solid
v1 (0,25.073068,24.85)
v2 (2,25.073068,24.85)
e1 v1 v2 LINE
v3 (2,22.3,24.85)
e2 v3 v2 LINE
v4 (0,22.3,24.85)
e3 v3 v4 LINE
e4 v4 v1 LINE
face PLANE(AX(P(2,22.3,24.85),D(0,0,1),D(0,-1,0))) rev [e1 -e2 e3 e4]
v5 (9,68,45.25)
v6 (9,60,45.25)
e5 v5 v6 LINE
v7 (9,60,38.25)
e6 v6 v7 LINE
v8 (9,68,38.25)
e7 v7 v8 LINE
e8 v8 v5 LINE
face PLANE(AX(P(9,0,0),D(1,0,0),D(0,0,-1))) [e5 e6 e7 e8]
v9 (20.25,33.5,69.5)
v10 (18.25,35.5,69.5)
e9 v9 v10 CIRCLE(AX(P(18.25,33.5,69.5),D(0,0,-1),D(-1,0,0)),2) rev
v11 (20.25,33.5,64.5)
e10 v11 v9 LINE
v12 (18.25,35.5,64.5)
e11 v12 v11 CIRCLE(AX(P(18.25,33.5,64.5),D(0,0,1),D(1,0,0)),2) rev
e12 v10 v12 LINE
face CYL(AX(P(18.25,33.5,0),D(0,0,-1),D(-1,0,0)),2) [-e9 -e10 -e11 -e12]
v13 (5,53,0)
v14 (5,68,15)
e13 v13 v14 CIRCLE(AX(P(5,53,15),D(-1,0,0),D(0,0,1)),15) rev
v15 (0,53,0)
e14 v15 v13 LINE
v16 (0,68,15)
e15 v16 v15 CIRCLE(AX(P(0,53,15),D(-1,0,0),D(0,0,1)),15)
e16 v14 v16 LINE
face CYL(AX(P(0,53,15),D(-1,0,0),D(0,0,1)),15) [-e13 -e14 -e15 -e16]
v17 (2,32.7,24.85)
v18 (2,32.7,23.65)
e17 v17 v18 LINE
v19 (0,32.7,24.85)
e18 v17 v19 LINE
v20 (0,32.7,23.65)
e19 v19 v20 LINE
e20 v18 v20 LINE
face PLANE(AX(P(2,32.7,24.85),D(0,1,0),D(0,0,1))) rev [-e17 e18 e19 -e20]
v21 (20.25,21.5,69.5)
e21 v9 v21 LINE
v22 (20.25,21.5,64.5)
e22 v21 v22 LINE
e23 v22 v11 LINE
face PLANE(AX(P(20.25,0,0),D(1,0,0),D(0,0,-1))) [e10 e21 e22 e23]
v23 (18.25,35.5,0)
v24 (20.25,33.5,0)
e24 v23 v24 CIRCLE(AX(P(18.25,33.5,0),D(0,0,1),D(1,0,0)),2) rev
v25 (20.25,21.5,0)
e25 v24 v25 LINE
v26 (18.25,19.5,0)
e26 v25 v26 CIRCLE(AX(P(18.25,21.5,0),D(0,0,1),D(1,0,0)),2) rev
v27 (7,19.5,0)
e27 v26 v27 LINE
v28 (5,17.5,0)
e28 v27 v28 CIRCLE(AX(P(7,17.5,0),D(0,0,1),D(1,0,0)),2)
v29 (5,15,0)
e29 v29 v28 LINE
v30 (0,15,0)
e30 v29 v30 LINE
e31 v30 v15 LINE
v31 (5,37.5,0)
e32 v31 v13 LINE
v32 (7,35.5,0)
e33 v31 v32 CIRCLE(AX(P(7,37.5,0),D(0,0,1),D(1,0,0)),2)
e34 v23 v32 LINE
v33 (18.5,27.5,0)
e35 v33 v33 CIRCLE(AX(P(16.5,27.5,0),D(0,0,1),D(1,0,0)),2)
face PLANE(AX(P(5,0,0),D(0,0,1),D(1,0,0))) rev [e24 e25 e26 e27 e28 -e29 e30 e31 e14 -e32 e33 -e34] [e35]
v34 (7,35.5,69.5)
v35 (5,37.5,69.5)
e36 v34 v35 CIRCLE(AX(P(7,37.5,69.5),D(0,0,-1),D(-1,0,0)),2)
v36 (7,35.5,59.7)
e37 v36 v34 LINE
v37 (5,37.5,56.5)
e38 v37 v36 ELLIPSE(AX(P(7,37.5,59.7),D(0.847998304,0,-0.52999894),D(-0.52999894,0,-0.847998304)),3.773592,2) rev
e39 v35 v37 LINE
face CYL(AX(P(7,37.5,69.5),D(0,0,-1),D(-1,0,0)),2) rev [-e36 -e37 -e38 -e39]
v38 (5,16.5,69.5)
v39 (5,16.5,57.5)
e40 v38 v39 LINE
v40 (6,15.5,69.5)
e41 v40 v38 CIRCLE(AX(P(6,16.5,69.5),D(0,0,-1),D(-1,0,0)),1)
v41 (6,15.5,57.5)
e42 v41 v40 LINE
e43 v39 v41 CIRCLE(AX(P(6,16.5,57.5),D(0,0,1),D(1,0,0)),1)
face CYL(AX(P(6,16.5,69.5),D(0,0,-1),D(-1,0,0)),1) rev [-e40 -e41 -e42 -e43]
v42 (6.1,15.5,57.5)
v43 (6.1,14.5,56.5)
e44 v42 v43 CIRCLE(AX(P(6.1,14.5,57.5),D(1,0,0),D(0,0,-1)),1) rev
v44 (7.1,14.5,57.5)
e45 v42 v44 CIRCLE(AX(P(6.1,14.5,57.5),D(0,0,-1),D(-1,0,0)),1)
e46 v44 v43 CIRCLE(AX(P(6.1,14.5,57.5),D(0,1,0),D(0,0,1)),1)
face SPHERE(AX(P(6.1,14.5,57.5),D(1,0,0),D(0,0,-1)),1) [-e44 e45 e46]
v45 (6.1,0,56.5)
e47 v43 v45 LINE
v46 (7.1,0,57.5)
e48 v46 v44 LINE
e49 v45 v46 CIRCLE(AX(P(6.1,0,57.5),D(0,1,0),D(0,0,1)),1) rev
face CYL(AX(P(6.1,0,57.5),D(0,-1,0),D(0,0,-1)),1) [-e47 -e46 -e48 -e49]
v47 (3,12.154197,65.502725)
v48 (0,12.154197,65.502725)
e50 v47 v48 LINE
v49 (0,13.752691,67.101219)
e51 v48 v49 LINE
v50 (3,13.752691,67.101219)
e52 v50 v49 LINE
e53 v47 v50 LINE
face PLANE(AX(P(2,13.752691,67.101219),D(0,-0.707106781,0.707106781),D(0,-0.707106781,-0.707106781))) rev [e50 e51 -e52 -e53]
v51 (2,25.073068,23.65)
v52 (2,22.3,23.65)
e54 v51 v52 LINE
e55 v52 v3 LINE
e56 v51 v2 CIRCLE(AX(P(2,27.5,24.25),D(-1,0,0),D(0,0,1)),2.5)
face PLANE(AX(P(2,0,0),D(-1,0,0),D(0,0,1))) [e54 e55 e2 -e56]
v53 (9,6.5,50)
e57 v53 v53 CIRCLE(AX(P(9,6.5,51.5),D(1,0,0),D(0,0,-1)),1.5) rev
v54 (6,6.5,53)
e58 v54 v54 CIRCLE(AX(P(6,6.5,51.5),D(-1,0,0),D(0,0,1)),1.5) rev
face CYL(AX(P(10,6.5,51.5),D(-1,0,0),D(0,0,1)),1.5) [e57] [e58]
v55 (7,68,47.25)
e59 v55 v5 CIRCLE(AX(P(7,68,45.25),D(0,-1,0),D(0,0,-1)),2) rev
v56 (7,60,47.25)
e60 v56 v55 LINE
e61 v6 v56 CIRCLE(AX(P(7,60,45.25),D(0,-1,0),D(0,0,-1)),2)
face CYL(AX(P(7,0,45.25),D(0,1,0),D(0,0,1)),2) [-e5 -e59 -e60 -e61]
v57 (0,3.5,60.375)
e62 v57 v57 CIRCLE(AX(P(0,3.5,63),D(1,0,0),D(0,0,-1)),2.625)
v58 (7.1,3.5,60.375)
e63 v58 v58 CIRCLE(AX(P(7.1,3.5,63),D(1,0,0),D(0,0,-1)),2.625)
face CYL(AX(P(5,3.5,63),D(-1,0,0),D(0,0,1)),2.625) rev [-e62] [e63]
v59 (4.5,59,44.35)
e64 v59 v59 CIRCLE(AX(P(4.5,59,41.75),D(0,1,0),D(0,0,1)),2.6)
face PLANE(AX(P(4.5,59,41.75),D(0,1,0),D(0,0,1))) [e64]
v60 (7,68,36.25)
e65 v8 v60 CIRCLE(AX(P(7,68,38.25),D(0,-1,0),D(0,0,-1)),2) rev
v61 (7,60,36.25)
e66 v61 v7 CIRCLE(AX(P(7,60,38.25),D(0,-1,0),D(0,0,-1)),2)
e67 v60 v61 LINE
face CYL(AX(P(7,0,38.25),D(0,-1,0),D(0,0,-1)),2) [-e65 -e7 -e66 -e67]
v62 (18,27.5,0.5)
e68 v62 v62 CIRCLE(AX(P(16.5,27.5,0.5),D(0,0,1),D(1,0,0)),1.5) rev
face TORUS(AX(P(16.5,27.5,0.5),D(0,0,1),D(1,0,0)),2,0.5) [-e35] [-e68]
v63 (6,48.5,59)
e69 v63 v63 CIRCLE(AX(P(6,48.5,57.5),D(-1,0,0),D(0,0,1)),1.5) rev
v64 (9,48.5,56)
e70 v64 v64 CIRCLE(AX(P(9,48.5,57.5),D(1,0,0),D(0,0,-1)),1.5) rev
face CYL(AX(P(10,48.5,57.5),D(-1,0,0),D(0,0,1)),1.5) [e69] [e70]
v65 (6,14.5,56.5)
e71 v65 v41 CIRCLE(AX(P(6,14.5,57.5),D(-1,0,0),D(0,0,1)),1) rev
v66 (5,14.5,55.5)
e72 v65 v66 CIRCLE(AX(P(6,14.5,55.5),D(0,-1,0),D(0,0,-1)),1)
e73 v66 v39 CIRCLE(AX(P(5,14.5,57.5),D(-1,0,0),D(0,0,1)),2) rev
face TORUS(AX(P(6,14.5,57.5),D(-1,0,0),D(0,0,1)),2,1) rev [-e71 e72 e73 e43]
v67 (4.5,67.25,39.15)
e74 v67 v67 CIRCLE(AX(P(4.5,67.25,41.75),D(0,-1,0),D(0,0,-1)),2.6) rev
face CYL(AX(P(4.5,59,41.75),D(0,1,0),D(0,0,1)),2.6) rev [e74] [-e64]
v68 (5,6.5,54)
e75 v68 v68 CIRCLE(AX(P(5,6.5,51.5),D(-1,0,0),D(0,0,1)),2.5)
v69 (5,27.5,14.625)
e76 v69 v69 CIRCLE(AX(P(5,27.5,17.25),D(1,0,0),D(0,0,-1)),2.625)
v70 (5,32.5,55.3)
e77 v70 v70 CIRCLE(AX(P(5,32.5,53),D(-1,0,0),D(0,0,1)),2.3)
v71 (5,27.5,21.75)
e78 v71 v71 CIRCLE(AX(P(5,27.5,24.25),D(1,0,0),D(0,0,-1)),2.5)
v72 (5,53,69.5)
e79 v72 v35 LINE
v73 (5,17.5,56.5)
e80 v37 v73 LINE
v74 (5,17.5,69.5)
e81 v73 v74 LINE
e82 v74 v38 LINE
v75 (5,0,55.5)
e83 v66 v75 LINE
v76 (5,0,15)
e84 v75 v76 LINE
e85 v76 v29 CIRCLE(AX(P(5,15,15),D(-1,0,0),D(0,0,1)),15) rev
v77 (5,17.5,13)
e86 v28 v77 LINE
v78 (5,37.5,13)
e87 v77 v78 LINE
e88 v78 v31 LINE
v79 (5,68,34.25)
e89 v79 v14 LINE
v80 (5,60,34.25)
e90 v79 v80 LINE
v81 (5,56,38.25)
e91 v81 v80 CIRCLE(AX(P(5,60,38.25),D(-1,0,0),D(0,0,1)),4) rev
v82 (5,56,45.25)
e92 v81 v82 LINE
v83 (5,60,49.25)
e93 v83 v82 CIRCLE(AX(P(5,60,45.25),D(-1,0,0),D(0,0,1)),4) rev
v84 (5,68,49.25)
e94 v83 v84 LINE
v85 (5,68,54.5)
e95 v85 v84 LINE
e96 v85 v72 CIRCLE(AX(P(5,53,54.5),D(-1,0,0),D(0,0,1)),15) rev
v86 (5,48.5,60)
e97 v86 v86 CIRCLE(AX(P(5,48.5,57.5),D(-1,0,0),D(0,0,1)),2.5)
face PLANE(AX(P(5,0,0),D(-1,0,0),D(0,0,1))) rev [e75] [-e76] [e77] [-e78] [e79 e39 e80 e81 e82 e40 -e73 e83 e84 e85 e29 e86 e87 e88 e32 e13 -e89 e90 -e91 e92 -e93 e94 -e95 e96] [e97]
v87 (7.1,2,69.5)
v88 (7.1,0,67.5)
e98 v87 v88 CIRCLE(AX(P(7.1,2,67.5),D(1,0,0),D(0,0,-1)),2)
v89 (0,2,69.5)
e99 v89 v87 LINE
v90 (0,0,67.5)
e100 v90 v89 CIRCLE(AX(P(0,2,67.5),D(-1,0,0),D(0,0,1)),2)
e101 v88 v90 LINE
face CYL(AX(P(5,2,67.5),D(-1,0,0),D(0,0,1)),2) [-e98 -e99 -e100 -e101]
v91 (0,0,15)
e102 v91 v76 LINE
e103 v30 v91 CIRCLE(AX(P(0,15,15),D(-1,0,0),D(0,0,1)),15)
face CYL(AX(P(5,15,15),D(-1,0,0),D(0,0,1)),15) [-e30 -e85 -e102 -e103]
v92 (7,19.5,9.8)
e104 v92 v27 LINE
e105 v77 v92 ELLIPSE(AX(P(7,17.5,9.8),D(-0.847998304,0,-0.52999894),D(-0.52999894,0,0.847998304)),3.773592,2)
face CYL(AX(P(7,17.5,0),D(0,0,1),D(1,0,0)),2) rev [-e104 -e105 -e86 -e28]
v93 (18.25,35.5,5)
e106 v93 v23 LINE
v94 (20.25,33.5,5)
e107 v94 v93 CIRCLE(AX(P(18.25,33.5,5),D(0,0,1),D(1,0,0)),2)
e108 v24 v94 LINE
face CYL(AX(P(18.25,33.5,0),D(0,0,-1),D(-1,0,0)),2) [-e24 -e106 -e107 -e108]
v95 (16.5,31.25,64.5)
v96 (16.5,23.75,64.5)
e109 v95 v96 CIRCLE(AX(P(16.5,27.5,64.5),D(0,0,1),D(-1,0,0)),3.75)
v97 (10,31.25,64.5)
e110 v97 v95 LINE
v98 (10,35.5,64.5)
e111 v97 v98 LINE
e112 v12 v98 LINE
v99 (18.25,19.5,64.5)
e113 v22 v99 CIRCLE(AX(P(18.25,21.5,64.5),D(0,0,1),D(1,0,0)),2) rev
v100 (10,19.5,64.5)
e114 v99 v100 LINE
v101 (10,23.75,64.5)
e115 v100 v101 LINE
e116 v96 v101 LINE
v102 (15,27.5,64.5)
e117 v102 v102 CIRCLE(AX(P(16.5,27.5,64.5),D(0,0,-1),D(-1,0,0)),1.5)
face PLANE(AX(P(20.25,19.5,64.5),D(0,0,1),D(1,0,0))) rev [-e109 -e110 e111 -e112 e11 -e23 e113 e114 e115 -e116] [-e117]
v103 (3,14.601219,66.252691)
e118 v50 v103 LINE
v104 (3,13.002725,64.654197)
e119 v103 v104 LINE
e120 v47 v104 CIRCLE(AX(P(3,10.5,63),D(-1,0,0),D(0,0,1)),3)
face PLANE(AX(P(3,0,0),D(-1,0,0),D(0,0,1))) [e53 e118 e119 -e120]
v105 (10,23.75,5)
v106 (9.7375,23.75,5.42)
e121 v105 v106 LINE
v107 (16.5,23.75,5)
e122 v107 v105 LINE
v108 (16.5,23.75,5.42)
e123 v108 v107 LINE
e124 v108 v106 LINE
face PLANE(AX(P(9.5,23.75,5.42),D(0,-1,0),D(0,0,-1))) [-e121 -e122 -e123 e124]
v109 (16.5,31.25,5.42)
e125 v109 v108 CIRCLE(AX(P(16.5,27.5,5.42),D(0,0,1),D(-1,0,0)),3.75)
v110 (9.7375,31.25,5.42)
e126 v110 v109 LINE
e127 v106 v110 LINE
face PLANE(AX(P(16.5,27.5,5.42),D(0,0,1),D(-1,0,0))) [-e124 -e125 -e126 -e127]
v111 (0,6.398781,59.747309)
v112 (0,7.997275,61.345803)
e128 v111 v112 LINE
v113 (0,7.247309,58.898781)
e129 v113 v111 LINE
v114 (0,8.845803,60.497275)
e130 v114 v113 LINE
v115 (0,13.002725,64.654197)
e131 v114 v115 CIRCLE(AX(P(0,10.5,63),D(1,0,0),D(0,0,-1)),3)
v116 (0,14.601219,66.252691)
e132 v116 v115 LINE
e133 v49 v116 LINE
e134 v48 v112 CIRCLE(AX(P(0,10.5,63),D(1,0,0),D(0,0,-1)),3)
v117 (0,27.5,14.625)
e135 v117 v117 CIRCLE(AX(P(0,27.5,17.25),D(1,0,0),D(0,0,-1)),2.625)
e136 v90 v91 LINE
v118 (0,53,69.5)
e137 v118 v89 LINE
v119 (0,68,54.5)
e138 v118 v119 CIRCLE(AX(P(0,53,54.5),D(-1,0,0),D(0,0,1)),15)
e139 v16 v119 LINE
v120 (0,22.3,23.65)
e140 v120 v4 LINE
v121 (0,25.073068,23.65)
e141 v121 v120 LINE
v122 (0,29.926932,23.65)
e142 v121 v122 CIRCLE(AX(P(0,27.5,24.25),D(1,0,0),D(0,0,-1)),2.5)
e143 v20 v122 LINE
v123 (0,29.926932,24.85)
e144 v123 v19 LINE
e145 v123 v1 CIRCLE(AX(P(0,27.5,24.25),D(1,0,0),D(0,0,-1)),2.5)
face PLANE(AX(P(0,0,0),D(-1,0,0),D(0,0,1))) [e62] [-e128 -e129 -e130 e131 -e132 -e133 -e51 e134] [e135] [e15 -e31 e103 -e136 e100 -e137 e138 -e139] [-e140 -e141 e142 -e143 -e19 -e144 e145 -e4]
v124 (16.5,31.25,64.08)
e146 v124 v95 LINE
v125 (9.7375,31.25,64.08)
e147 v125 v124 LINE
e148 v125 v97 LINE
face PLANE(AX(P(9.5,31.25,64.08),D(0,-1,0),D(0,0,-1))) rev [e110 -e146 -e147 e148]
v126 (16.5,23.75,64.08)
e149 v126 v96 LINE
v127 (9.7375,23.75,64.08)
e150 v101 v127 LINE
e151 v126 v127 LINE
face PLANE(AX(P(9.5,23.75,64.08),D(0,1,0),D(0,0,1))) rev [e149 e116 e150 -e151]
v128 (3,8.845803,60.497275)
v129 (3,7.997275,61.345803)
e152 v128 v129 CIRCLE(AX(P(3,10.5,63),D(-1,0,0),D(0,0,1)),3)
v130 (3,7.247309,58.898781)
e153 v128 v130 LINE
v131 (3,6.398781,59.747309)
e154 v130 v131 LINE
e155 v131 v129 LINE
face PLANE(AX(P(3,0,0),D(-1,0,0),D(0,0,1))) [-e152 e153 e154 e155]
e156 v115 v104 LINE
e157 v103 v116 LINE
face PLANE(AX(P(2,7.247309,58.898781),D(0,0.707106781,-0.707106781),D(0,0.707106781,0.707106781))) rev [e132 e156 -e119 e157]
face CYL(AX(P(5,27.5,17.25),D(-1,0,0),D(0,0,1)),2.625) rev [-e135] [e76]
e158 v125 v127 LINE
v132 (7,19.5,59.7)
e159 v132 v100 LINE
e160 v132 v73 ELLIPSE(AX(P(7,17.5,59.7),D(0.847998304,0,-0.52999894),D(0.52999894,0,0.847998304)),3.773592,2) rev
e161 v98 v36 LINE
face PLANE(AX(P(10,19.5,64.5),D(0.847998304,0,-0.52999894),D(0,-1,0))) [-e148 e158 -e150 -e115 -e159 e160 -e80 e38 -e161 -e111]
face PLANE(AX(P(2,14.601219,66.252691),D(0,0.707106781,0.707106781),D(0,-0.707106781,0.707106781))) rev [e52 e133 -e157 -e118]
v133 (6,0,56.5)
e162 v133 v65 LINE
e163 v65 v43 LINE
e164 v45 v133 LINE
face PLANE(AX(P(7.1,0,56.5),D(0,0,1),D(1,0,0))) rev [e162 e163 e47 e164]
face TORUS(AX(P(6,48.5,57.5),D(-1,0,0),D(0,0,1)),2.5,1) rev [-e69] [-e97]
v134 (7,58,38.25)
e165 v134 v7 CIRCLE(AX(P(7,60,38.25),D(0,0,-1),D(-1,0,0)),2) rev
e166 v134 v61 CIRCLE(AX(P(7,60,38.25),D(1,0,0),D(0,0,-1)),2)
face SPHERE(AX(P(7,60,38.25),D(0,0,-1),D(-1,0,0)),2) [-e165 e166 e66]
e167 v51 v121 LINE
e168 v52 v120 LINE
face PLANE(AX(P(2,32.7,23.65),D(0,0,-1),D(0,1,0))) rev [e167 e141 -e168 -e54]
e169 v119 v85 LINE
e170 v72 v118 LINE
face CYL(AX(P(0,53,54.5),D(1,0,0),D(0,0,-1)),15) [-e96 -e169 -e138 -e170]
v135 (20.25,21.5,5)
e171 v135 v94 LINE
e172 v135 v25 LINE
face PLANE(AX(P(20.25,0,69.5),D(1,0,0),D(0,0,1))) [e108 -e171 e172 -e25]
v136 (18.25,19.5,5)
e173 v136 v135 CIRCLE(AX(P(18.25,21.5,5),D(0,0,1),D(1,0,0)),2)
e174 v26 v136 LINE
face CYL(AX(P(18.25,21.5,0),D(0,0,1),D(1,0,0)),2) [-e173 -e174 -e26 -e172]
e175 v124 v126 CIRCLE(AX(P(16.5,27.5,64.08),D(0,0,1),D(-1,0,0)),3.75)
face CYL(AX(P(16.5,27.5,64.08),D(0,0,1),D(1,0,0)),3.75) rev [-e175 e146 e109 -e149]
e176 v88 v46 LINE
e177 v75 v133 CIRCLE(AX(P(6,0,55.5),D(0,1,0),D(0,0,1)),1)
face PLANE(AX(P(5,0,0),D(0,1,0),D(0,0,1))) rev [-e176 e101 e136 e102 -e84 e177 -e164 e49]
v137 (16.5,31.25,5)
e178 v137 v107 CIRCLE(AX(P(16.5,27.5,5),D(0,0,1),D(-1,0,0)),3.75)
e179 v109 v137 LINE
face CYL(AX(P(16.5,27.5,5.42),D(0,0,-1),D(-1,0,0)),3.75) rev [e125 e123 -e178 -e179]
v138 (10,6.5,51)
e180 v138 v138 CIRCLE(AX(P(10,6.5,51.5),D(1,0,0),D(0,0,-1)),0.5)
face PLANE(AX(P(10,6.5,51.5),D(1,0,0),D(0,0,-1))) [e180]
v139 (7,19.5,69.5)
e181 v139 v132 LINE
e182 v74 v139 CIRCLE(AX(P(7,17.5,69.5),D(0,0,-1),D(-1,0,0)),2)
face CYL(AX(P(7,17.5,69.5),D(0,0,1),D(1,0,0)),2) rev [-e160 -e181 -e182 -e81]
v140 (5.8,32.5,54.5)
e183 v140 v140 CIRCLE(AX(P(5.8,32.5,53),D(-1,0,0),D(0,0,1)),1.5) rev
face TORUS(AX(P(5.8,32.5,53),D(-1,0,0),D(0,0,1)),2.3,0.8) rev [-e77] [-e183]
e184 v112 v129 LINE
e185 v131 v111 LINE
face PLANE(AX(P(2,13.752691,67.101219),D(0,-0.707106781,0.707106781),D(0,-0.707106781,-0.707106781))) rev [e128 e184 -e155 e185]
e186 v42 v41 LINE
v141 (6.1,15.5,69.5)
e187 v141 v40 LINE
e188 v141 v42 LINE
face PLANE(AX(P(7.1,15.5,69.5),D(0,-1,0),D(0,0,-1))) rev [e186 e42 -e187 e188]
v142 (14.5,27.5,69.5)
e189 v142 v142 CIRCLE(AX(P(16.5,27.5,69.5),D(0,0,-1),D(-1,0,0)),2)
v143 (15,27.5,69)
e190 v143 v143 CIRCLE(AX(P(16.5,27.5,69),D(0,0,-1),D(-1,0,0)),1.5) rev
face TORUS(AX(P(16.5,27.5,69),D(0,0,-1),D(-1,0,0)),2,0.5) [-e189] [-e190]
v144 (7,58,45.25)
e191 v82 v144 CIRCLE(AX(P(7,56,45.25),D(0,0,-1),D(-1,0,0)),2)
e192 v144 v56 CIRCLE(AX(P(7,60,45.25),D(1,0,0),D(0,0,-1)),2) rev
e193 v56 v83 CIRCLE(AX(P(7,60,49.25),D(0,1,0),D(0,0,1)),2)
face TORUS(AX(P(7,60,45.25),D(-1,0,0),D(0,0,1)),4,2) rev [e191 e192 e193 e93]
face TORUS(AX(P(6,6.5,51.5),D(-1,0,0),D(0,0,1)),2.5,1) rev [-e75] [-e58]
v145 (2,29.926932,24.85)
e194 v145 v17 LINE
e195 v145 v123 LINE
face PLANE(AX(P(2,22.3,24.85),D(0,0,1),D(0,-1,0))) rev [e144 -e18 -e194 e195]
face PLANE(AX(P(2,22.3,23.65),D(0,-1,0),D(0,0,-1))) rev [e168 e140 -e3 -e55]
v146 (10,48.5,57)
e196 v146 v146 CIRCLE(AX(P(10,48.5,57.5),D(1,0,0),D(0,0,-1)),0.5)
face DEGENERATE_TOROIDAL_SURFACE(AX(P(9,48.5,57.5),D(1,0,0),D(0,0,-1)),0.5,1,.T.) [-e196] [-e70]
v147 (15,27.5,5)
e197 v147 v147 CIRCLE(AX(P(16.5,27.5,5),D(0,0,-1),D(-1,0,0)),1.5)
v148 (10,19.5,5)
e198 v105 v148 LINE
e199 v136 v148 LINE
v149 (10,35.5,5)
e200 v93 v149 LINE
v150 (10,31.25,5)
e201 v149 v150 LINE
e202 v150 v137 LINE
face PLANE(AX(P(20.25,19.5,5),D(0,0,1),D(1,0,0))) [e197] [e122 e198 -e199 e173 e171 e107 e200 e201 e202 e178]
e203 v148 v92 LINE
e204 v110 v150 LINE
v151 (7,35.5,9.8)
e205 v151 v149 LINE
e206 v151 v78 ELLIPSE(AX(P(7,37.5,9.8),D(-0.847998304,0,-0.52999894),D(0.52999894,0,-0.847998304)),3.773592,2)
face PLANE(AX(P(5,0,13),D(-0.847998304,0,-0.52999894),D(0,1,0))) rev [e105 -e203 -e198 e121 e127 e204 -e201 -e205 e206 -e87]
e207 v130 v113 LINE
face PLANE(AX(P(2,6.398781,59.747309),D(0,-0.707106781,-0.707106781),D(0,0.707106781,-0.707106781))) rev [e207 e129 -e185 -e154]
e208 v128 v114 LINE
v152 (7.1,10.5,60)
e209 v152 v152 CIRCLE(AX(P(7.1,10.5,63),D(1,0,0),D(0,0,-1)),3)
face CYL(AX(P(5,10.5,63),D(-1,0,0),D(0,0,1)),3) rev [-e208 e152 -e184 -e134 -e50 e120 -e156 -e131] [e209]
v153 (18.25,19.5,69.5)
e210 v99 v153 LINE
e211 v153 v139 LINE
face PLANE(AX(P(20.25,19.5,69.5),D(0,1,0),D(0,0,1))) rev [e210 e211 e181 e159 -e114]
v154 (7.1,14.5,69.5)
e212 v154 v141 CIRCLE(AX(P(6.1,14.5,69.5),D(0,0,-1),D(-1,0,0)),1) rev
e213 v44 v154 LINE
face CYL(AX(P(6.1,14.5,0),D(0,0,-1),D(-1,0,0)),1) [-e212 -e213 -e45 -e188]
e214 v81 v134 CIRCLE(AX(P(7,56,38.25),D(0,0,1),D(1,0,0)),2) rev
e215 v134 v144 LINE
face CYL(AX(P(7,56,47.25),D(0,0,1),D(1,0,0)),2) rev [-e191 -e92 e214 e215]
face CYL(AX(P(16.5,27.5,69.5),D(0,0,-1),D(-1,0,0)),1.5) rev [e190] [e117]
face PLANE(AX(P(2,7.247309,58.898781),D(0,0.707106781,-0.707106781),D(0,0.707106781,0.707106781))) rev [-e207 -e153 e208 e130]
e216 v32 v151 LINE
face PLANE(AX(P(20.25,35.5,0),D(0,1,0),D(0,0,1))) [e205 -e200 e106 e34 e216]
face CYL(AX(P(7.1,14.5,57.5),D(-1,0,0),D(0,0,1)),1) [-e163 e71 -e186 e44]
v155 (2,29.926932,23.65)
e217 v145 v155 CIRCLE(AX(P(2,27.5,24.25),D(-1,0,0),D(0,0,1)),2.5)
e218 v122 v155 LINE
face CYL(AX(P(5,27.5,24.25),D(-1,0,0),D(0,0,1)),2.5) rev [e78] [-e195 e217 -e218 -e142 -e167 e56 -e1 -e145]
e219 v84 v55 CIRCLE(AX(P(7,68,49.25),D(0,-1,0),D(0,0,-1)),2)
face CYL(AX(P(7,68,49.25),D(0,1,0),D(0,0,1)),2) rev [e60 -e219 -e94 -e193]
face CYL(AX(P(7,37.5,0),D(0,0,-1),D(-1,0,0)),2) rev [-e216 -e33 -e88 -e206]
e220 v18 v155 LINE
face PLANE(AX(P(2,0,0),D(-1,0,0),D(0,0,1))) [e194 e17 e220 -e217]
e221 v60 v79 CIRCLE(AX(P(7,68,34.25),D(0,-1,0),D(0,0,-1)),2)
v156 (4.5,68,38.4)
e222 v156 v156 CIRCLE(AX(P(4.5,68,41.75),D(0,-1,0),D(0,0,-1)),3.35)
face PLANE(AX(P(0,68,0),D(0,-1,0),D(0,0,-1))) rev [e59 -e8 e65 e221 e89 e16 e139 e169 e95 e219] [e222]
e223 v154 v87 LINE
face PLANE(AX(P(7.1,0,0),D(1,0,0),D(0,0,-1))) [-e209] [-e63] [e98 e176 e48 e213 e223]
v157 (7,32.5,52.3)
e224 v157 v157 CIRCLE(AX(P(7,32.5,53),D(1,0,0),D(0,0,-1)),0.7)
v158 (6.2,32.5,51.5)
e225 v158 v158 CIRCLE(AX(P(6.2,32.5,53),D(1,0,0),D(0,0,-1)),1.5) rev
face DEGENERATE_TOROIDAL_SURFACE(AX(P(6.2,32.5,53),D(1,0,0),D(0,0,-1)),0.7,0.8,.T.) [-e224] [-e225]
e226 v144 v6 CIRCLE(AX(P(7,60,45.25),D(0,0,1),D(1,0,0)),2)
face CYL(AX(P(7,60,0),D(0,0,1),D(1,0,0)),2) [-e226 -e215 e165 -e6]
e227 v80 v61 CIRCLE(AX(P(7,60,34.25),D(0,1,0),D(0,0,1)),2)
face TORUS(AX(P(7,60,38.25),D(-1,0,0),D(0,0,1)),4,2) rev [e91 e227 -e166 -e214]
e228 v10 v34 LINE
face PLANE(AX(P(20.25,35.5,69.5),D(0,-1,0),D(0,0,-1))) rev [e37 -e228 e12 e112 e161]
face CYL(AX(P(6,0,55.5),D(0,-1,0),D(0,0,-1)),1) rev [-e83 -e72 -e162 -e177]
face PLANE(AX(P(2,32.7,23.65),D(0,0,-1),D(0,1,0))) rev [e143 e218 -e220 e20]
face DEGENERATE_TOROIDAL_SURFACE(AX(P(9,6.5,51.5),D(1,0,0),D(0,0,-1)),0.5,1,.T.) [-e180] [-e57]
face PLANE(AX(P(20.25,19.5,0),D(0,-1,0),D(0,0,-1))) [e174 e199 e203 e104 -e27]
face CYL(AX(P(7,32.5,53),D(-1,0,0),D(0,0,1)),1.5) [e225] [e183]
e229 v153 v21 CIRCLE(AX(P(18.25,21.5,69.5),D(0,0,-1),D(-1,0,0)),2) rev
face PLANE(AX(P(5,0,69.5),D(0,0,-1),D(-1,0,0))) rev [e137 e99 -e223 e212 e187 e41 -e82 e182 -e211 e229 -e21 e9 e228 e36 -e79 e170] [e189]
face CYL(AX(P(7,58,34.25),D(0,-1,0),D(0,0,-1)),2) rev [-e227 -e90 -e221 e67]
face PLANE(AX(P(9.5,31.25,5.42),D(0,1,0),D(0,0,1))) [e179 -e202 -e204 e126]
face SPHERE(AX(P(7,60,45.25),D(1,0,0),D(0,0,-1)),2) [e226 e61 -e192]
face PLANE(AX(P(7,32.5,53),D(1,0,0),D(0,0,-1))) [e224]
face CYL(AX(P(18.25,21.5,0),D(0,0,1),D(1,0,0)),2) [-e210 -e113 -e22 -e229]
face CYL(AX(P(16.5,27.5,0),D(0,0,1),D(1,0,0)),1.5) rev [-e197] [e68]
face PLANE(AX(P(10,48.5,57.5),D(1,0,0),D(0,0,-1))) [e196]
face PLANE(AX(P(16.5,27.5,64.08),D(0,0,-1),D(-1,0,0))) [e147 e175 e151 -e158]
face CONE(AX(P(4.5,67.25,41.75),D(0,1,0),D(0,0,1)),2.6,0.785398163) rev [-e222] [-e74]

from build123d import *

# Parameters (mm, degrees)
SKETCH1_W           = 55
SKETCH1_H           = 69.5
SKETCH1_R           = 3
SKETCH1_R_2         = 2.5
SKETCH1_R_3         = 2.625
BOSS_EXTRUDE1_DEPTH = 5
SKETCH3_W           = 16
SKETCH3_H           = 5
BOSS_EXTRUDE2_DEPTH = 15.25
SKETCH4_R           = 1.5
CUT_EXTRUDE1_DEPTH  = 88.151090068
SKETCH5_W           = 10.4
SKETCH5_H           = 1.2
CUT_EXTRUDE2_DEPTH  = 2
SKETCH6_W           = 15.5
SKETCH6_H           = 13
SKETCH6_R           = 3
SKETCH6_R_2         = 2.625
BOSS_EXTRUDE3_DEPTH = 2.1
SKETCH13_R          = 1.5
BOSS_EXTRUDE5_DEPTH = 5
SKETCH14_R          = 1.5
BOSS_EXTRUDE6_DEPTH = 2
CUT_EXTRUDE3_START  = -1
CUT_EXTRUDE3_DEPTH  = 1
CHAMFER1_SIZE       = 8
CHAMFER1_SIZE2      = 5
CHAMFER2_SIZE       = 5
CHAMFER2_SIZE2      = 8
FILLET3_R           = 0.5
FILLET2_R           = 2
FILLET4_R           = 1
FILLET5_R           = 0.8
BOSS_EXTRUDE4_DEPTH = 0.42
SKETCH18_W          = 5
SKETCH18_H          = 69.5
BOSS_EXTRUDE8_DEPTH = 13
SKETCH15_W          = 10
SKETCH15_H          = 11
BOSS_EXTRUDE7_DEPTH = 4
FILLET1_R           = 15
SKETCH16_R          = 2.6
CUT_EXTRUDE8_DEPTH  = 9
CHAMFER3_SIZE       = 0.75
FILLET6_R           = 2


# Read off the part's stored shape, not the designer's step: Cut-Extrude3
with BuildPart() as part:
    # Sketch1 → Boss-Extrude1 (new body)
    with BuildSketch(Plane.YZ):
        with Locations((27.5, 34.75)):
            Rectangle(SKETCH1_W, SKETCH1_H)
        with Locations(Location((10.5, 63, 0), (0, 0, 270))):
            Circle(SKETCH1_R, mode=Mode.SUBTRACT)
        with Locations(Location((27.5, 24.25, 0), (0, 0, 270))):
            Circle(SKETCH1_R_2, mode=Mode.SUBTRACT)
        with Locations(Location((3.5, 63, 0), (0, 0, 270))):
            Circle(SKETCH1_R_3, mode=Mode.SUBTRACT)
        with Locations(Location((27.5, 17.25, 0), (0, 0, 270))):
            Circle(SKETCH1_R_3, mode=Mode.SUBTRACT)
    extrude(amount=BOSS_EXTRUDE1_DEPTH)

    # Sketch3 → Boss-Extrude2 (add)
    with BuildSketch(Plane.YZ.offset(5)):
        with Locations((27.5, 67)):
            Rectangle(SKETCH3_W, SKETCH3_H)
    boss_extrude2 = extrude(amount=BOSS_EXTRUDE2_DEPTH)

    # Sketch4 → Cut-Extrude1 (cut, through all)
    with BuildSketch(Plane(origin=(0, 0, 64.5), x_dir=(1, 0, 0), z_dir=(0, 0, -1))):
        with Locations(Location((16.5, -27.5, 0), (0, 0, 180))):
            Circle(SKETCH4_R)
    cut_extrude1 = extrude(amount=-CUT_EXTRUDE1_DEPTH, mode=Mode.SUBTRACT)

    # Mirror1: Boss-Extrude2, Cut-Extrude1 across plane
    add(boss_extrude2.mirror(Plane(origin=(0, 0, 34.75), x_dir=(1, 0, 0), z_dir=(0, 0, -1))))
    add(cut_extrude1.mirror(Plane(origin=(0, 0, 34.75), x_dir=(1, 0, 0), z_dir=(0, 0, -1))), mode=Mode.SUBTRACT)

    # Sketch5 → Cut-Extrude2 (cut)
    with BuildSketch(Plane(origin=(0, 0, 0), x_dir=(0, -1, 0), z_dir=(-1, 0, 0))):
        Polygon((-6.398780669, 59.747308807), (-7.247308807, 58.898780669), (-14.601219331, 66.252691193), (-13.752691193, 67.101219331), align=None)
        with Locations((-27.5, 24.25)):
            Rectangle(SKETCH5_W, SKETCH5_H)
    extrude(amount=-CUT_EXTRUDE2_DEPTH, mode=Mode.SUBTRACT)

    # Sketch6 → Boss-Extrude3 (add)
    with BuildSketch(Plane.YZ.offset(5)):
        with Locations((7.75, 63)):
            Rectangle(SKETCH6_W, SKETCH6_H)
        with Locations(Location((10.5, 63, 0), (0, 0, 56.536959033))):
            Circle(SKETCH6_R, mode=Mode.SUBTRACT)
        with Locations(Location((3.5, 63, 0), (0, 0, 270))):
            Circle(SKETCH6_R_2, mode=Mode.SUBTRACT)
    extrude(amount=BOSS_EXTRUDE3_DEPTH)

    # Sketch13 → Boss-Extrude5 (add)
    with BuildSketch(Plane.YZ.offset(5)):
        with Locations(Location((48.5, 57.5, 0), (0, 0, 90))):
            Circle(SKETCH13_R)
        with Locations(Location((6.5, 51.5, 0), (0, 0, 90))):
            Circle(SKETCH13_R)
    extrude(amount=BOSS_EXTRUDE5_DEPTH)

    # Sketch14 → Boss-Extrude6 (add)
    with BuildSketch(Plane.YZ.offset(5)):
        with Locations(Location((32.5, 53, 0), (0, 0, 90))):
            Circle(SKETCH14_R)
    extrude(amount=BOSS_EXTRUDE6_DEPTH)

    # Cut-Extrude3 outline → Cut-Extrude3 (cut)
    with BuildSketch(Plane(origin=(2, 0, 0), x_dir=(0, -1, 0), z_dir=(-1, 0, 0)).offset(CUT_EXTRUDE3_START)):
        with BuildLine():
            Line((-7.247308807, 58.898780669), (-6.398780669, 59.747308807))
            Line((-6.398780669, 59.747308807), (-7.997274962, 61.3458031))
            ThreePointArc((-7.997274962, 61.3458031), (-8.378679656, 60.878679656), (-8.8458031, 60.497274962))
            Line((-8.8458031, 60.497274962), (-7.247308807, 58.898780669))
        make_face()
        with BuildLine():
            Line((-14.601219331, 66.252691193), (-13.002725038, 64.6541969))
            ThreePointArc((-13.002725038, 64.6541969), (-12.621320344, 65.121320344), (-12.1541969, 65.502725038))
            Line((-12.1541969, 65.502725038), (-13.752691193, 67.101219331))
            Line((-13.752691193, 67.101219331), (-14.601219331, 66.252691193))
        make_face()
    extrude(amount=CUT_EXTRUDE3_DEPTH, mode=Mode.SUBTRACT)

    # Chamfer1
    chamfer1_edges = [part.edges().sort_by_distance(p)[0] for p in [
        (5, 27.5, 64.5),
    ]]
    chamfer1_side = [part.faces().sort_by_distance(p)[0] for p in [
        (5, 28.660590977, 33.127058203),
    ]]
    chamfer(chamfer1_edges, length=CHAMFER1_SIZE, length2=CHAMFER1_SIZE2, reference=chamfer1_side[0])

    # Chamfer2
    chamfer2_edges = [part.edges().sort_by_distance(p)[0] for p in [
        (5, 27.5, 5),
    ]]
    chamfer2_side = [part.faces().sort_by_distance(p)[0] for p in [
        (12.509393715, 27.5, 5),
    ]]
    chamfer(chamfer2_edges, length=CHAMFER2_SIZE, length2=CHAMFER2_SIZE2, reference=chamfer2_side[0])

    # Fillet3
    fillet3_edges = [part.edges().sort_by_distance(p)[0] for p in [
        (18, 27.5, 69.5),
        (18, 27.5, 0),
    ]]
    fillet(fillet3_edges, radius=FILLET3_R)

    # Fillet2
    fillet2_edges = [part.edges().sort_by_distance(p)[0] for p in [
        (5, 19.5, 63),
        (5, 35.5, 63),
        (20.25, 19.5, 67),
        (20.25, 35.5, 67),
        (20.25, 19.5, 2.5),
        (20.25, 35.5, 2.5),
        (5, 19.5, 6.5),
        (5, 35.5, 6.5),
        (3.55, 0, 69.5),
    ]]
    fillet(fillet2_edges, radius=FILLET2_R)

    # Fillet4
    fillet4_edges = [part.edges().sort_by_distance(p)[0] for p in [
        (7.1, 7.75, 56.5),
        (7.1, 15.5, 63),
        (5, 7.75, 56.5),
        (5, 15.5, 63),
        (6.05, 15.5, 56.5),
        (5, 6.5, 50),
        (5, 48.5, 56),
        (10, 48.5, 56),
        (10, 6.5, 50),
    ]]
    fillet(fillet4_edges, radius=FILLET4_R)

    # Fillet5
    fillet5_edges = [part.edges().sort_by_distance(p)[0] for p in [
        (5, 32.5, 51.5),
        (7, 32.5, 51.5),
    ]]
    fillet(fillet5_edges, radius=FILLET5_R)

    # Sketch8 → Boss-Extrude4 (add)
    with BuildSketch(Plane(origin=(0, 0, 64.5), x_dir=(1, 0, 0), z_dir=(0, 0, -1))):
        with BuildLine():
            Line((9.5, -23.75), (16.5, -23.75))
            ThreePointArc((16.5, -23.75), (12.75, -27.5), (16.5, -31.25))
            Line((16.5, -31.25), (9.5, -31.25))
            Line((9.5, -31.25), (9.5, -23.75))
        make_face()
    boss_extrude4 = extrude(amount=BOSS_EXTRUDE4_DEPTH)

    # Mirror2: Boss-Extrude4 across plane
    add(boss_extrude4.mirror(Plane(origin=(0, 0, 34.75), x_dir=(1, 0, 0), z_dir=(0, 0, -1))))

    # Sketch18 → Boss-Extrude8 (add)
    with BuildSketch(Plane(origin=(0, 55, 0), x_dir=(-1, 0, 0), z_dir=(0, 1, 0))):
        with Locations((-2.5, 34.75)):
            Rectangle(SKETCH18_W, SKETCH18_H)
    extrude(amount=BOSS_EXTRUDE8_DEPTH)

    # Sketch15 → Boss-Extrude7 (add)
    with BuildSketch(Plane.YZ.offset(5)):
        with Locations((63, 41.75)):
            Rectangle(SKETCH15_W, SKETCH15_H)
    extrude(amount=BOSS_EXTRUDE7_DEPTH)

    # Fillet1
    fillet1_edges = [part.edges().sort_by_distance(p)[0] for p in [
        (2.5, 68, 0),
        (2.5, 68, 69.5),
        (2.5, 0, 0),
    ]]
    fillet(fillet1_edges, radius=FILLET1_R)

    # Sketch16 → Cut-Extrude8 (cut)
    with BuildSketch(Plane(origin=(0, 68, 0), x_dir=(-1, 0, 0), z_dir=(0, 1, 0))):
        with Locations(Location((-4.5, 41.75, 0), (0, 0, 90))):
            Circle(SKETCH16_R)
    extrude(amount=-CUT_EXTRUDE8_DEPTH, mode=Mode.SUBTRACT)

    # Chamfer3
    chamfer3_edges = [part.edges().sort_by_distance(p)[0] for p in [
        (4.5, 68, 39.15),
    ]]
    chamfer(chamfer3_edges, length=CHAMFER3_SIZE)

    # Fillet6
    fillet6_edges = [part.edges().sort_by_distance(p)[0] for p in [
        (5, 63, 47.25),
        (5, 58, 41.75),
        (7, 58, 47.25),
        (5, 63, 36.25),
        (7, 58, 36.25),
        (9, 63, 47.25),
        (9, 58, 41.75),
        (9, 63, 36.25),
    ]]
    fillet(fillet6_edges, radius=FILLET6_R - 0.0001)  # a hair under: the kernel refuses the full size


solid = part.part
